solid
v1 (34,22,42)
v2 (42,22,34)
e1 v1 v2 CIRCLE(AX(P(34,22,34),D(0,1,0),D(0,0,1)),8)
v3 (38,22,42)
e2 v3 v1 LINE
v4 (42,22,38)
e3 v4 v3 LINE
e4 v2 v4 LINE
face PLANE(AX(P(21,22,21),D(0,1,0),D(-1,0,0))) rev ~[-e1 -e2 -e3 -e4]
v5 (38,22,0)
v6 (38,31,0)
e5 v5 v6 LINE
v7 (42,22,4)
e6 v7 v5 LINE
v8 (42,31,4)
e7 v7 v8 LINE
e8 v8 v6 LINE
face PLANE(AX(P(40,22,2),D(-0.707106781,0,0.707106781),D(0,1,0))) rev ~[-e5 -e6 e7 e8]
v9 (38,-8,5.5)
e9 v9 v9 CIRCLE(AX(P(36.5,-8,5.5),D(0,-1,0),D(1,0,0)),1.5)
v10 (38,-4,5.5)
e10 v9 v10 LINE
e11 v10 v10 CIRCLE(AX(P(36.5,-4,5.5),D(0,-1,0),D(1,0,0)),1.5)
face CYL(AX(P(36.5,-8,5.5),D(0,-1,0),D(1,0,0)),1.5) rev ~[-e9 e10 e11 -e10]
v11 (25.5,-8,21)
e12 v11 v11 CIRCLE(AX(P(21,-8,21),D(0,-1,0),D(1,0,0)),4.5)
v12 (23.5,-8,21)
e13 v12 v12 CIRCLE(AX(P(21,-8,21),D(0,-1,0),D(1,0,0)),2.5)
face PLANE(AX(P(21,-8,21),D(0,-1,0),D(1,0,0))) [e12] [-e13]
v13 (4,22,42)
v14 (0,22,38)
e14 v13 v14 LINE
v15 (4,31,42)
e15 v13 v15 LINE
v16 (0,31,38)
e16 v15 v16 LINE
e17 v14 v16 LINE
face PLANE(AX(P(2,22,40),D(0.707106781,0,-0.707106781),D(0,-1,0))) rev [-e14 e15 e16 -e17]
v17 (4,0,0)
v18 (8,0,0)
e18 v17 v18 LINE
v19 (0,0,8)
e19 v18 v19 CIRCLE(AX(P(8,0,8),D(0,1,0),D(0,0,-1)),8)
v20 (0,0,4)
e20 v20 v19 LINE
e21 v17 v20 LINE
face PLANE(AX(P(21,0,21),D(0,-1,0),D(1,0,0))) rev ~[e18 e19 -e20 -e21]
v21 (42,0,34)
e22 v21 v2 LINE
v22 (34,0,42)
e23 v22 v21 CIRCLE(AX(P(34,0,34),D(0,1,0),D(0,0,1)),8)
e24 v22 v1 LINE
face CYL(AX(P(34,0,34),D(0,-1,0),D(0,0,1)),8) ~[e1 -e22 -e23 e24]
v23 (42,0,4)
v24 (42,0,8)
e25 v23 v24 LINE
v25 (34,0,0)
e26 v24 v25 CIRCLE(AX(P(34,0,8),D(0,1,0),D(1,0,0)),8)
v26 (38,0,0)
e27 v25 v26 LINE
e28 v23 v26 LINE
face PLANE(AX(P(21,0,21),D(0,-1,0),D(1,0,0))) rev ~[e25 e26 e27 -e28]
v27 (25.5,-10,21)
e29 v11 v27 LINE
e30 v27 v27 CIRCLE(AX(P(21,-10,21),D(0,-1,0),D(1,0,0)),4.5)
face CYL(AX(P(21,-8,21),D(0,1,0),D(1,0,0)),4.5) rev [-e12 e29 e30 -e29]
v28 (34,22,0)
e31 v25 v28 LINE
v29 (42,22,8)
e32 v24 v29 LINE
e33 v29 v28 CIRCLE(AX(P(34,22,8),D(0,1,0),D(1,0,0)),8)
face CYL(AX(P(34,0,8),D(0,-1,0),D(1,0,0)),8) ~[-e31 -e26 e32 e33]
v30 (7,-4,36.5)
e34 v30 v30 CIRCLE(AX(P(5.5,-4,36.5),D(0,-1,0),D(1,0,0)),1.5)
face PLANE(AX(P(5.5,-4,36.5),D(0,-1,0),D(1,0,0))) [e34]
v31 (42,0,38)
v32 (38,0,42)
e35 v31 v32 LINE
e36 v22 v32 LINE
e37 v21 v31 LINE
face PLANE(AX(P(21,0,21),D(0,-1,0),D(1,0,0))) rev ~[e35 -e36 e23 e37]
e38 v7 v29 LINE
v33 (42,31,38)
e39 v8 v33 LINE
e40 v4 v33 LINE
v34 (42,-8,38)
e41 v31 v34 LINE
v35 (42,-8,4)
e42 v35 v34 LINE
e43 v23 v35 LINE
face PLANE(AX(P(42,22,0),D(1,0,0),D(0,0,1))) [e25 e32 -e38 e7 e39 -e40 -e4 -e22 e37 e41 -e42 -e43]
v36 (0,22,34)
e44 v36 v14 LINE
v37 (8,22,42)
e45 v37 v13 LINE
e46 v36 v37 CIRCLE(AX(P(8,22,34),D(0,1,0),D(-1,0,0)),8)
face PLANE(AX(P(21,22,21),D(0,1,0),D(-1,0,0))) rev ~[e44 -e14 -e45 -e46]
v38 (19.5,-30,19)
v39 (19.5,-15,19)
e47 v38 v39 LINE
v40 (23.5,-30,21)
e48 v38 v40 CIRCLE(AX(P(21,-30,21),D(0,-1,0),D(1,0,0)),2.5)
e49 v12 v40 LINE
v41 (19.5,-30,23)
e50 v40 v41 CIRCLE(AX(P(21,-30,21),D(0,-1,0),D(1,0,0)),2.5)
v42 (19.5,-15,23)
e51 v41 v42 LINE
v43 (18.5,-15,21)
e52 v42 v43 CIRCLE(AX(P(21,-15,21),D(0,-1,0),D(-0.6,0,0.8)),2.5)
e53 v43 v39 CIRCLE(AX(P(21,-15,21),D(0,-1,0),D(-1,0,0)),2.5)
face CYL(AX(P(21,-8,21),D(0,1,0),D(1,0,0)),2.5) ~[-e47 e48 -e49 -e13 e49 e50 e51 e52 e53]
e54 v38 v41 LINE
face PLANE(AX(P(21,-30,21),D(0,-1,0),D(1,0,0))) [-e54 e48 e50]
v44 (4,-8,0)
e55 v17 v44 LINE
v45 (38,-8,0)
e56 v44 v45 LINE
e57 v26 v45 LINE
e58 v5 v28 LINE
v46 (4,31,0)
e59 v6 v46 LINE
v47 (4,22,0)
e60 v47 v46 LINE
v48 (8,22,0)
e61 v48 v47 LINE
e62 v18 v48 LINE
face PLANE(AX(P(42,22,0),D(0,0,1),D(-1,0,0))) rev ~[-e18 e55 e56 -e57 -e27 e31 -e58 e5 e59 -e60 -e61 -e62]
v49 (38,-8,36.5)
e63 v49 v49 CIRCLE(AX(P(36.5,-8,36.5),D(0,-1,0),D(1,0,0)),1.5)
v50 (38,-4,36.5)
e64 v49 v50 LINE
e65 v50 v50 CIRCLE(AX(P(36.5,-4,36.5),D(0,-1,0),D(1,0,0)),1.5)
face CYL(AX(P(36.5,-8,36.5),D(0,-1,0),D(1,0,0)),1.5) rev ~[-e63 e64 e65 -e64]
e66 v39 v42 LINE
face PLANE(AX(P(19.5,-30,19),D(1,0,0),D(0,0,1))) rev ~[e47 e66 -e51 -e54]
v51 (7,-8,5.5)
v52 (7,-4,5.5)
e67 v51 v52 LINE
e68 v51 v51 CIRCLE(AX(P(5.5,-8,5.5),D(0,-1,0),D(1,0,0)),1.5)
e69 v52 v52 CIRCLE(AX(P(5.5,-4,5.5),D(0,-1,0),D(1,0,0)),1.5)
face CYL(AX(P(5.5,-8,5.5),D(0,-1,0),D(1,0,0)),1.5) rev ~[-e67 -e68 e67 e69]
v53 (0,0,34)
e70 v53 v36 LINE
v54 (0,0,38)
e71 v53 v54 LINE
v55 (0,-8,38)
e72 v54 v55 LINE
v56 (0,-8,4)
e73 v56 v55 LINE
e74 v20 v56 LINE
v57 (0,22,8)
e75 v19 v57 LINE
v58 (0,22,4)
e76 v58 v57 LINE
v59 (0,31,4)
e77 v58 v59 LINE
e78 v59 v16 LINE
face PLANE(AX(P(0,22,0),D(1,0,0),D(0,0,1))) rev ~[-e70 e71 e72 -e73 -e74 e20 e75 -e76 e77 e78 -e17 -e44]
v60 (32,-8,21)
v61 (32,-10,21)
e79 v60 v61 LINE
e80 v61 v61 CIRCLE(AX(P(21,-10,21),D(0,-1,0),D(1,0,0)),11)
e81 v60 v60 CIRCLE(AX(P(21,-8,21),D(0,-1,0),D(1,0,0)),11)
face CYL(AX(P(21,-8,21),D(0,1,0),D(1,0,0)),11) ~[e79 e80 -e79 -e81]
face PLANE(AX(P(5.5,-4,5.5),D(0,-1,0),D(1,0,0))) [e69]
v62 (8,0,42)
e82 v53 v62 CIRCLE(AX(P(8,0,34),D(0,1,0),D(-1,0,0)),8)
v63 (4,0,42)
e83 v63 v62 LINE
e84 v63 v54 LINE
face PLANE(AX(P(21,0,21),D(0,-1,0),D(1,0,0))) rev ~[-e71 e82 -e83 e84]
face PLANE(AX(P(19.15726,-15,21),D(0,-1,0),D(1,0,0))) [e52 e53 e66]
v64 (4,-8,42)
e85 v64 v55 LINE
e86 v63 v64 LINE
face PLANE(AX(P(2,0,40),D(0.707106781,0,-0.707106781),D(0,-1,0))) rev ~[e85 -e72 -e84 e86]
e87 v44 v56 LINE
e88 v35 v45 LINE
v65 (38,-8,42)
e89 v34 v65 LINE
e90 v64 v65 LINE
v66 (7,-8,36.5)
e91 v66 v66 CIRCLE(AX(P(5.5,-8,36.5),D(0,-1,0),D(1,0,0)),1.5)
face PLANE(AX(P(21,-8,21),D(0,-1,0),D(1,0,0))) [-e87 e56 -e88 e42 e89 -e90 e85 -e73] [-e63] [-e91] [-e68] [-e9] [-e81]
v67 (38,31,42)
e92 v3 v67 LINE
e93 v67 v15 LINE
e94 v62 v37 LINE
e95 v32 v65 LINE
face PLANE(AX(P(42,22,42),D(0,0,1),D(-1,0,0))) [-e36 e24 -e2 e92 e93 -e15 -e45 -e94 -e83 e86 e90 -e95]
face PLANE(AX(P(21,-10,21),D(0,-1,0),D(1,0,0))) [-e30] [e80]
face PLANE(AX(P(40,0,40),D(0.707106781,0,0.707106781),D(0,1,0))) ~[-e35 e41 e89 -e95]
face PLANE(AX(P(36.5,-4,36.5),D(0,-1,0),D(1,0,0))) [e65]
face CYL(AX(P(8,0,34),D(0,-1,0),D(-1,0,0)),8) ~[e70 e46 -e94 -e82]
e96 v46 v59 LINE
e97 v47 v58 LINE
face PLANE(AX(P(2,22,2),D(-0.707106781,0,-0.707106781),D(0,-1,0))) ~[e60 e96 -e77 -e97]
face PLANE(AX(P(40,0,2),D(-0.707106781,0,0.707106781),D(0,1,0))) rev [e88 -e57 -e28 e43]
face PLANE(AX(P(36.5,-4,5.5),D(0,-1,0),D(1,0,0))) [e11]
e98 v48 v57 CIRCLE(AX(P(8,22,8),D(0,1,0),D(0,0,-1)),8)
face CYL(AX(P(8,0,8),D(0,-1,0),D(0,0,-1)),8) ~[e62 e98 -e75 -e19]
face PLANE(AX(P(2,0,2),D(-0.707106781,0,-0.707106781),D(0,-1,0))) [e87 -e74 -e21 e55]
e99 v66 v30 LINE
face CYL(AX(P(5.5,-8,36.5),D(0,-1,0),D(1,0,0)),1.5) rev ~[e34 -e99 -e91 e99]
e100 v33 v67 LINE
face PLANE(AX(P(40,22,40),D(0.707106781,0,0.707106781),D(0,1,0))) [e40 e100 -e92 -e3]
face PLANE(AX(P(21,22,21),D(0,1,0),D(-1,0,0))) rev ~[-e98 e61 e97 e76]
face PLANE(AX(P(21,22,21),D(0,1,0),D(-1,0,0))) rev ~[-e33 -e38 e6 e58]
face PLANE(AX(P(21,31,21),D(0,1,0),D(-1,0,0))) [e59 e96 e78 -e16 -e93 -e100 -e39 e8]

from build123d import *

# Parameters (mm, degrees)
F0_W      = 42
F0_H      = 42
F1_DEPTH  = 8
F3_DEPTH  = 22
F4_W      = 42
F4_H      = 42
F5_DEPTH  = 9
F6_R      = 11
F6_R_2    = 4.5
F7_DEPTH  = 2
F8_R      = 2.5
F9_DEPTH  = 22
F11_DEPTH = 15
F12_R     = 1.5
F13_DEPTH = 4
F14_SIZE  = 4


with BuildPart() as f1:
    # F0 (on Front) → F1 (new body)
    with BuildSketch(Plane.XZ):
        with Locations((21, 21)):
            Rectangle(F0_W, F0_H)
    extrude(amount=F1_DEPTH)

    # F2 (on face) → F3 (join)
    with BuildSketch(Plane(origin=(0, 0, 0), x_dir=(-1, 0, 0), z_dir=(0, 1, 0))):
        with BuildLine():
            Line((0, 8), (0, 21))
            Line((0, 21), (0, 34))
            ThreePointArc((0, 34), (-2.3431457505, 39.6568542495), (-8, 42))
            Line((-8, 42), (-21, 42))
            Line((-21, 42), (-34, 42))
            ThreePointArc((-34, 42), (-39.6568542495, 39.6568542495), (-42, 34))
            Line((-42, 34), (-42, 21))
            Line((-42, 21), (-42, 8))
            ThreePointArc((-42, 8), (-39.6568542495, 2.3431457505), (-34, 0))
            Line((-34, 0), (-21, 0))
            Line((-21, 0), (-8, 0))
            ThreePointArc((-8, 0), (-2.3431457505, 2.3431457505), (0, 8))
        make_face()
    extrude(amount=F3_DEPTH)

    # F4 (on face) → F5 (join)
    with BuildSketch(Plane(origin=(0, 22, 0), x_dir=(-1, 0, 0), z_dir=(0, 1, 0))):
        with Locations((-21, 21)):
            Rectangle(F4_W, F4_H)
    extrude(amount=F5_DEPTH)

    # F6 (on face) → F7 (join)
    with BuildSketch(Plane.XZ.offset(8)):
        with Locations((21, 21)):
            Circle(F6_R)
        with Locations((21, 21)):
            Circle(F6_R_2, mode=Mode.SUBTRACT)
    extrude(amount=F7_DEPTH)

    # F8 (on face) → F9 (join)
    with BuildSketch(Plane.XZ.offset(8)):
        with Locations((21, 21)):
            Circle(F8_R)
    extrude(amount=F9_DEPTH)

    # F10 (on face) → F11 (cut)
    with BuildSketch(Plane.XZ.offset(30)):
        with BuildLine():
            Line((19.5, 19), (19.5, 23))
            ThreePointArc((19.5, 23), (18.7639320225, 22.1180339887), (18.5, 21))
            ThreePointArc((18.5, 21), (18.7639320225, 19.8819660113), (19.5, 19))
        make_face()
    extrude(amount=-F11_DEPTH, mode=Mode.SUBTRACT)

    # F12 (on face) → F13 (cut)
    with BuildSketch(Plane.XZ.offset(8)):
        with Locations((5.5, 5.5)):
            Circle(F12_R)
        with Locations((5.5, 36.5)):
            Circle(F12_R)
        with Locations((36.5, 36.5)):
            Circle(F12_R)
        with Locations((36.5, 5.5)):
            Circle(F12_R)
    extrude(amount=-F13_DEPTH, mode=Mode.SUBTRACT)

    # F14
    f14_edges = [f1.edges().sort_by_distance(p)[0] for p in [
        (0, -4, 42),
        (0, 26.5, 42),
        (42, -4, 42),
        (42, 26.5, 42),
        (42, 26.5, 0),
        (42, -4, 0),
        (0, -4, 0),
        (0, 26.5, 0),
    ]]
    chamfer(f14_edges, length=F14_SIZE)


solid = f1.part
